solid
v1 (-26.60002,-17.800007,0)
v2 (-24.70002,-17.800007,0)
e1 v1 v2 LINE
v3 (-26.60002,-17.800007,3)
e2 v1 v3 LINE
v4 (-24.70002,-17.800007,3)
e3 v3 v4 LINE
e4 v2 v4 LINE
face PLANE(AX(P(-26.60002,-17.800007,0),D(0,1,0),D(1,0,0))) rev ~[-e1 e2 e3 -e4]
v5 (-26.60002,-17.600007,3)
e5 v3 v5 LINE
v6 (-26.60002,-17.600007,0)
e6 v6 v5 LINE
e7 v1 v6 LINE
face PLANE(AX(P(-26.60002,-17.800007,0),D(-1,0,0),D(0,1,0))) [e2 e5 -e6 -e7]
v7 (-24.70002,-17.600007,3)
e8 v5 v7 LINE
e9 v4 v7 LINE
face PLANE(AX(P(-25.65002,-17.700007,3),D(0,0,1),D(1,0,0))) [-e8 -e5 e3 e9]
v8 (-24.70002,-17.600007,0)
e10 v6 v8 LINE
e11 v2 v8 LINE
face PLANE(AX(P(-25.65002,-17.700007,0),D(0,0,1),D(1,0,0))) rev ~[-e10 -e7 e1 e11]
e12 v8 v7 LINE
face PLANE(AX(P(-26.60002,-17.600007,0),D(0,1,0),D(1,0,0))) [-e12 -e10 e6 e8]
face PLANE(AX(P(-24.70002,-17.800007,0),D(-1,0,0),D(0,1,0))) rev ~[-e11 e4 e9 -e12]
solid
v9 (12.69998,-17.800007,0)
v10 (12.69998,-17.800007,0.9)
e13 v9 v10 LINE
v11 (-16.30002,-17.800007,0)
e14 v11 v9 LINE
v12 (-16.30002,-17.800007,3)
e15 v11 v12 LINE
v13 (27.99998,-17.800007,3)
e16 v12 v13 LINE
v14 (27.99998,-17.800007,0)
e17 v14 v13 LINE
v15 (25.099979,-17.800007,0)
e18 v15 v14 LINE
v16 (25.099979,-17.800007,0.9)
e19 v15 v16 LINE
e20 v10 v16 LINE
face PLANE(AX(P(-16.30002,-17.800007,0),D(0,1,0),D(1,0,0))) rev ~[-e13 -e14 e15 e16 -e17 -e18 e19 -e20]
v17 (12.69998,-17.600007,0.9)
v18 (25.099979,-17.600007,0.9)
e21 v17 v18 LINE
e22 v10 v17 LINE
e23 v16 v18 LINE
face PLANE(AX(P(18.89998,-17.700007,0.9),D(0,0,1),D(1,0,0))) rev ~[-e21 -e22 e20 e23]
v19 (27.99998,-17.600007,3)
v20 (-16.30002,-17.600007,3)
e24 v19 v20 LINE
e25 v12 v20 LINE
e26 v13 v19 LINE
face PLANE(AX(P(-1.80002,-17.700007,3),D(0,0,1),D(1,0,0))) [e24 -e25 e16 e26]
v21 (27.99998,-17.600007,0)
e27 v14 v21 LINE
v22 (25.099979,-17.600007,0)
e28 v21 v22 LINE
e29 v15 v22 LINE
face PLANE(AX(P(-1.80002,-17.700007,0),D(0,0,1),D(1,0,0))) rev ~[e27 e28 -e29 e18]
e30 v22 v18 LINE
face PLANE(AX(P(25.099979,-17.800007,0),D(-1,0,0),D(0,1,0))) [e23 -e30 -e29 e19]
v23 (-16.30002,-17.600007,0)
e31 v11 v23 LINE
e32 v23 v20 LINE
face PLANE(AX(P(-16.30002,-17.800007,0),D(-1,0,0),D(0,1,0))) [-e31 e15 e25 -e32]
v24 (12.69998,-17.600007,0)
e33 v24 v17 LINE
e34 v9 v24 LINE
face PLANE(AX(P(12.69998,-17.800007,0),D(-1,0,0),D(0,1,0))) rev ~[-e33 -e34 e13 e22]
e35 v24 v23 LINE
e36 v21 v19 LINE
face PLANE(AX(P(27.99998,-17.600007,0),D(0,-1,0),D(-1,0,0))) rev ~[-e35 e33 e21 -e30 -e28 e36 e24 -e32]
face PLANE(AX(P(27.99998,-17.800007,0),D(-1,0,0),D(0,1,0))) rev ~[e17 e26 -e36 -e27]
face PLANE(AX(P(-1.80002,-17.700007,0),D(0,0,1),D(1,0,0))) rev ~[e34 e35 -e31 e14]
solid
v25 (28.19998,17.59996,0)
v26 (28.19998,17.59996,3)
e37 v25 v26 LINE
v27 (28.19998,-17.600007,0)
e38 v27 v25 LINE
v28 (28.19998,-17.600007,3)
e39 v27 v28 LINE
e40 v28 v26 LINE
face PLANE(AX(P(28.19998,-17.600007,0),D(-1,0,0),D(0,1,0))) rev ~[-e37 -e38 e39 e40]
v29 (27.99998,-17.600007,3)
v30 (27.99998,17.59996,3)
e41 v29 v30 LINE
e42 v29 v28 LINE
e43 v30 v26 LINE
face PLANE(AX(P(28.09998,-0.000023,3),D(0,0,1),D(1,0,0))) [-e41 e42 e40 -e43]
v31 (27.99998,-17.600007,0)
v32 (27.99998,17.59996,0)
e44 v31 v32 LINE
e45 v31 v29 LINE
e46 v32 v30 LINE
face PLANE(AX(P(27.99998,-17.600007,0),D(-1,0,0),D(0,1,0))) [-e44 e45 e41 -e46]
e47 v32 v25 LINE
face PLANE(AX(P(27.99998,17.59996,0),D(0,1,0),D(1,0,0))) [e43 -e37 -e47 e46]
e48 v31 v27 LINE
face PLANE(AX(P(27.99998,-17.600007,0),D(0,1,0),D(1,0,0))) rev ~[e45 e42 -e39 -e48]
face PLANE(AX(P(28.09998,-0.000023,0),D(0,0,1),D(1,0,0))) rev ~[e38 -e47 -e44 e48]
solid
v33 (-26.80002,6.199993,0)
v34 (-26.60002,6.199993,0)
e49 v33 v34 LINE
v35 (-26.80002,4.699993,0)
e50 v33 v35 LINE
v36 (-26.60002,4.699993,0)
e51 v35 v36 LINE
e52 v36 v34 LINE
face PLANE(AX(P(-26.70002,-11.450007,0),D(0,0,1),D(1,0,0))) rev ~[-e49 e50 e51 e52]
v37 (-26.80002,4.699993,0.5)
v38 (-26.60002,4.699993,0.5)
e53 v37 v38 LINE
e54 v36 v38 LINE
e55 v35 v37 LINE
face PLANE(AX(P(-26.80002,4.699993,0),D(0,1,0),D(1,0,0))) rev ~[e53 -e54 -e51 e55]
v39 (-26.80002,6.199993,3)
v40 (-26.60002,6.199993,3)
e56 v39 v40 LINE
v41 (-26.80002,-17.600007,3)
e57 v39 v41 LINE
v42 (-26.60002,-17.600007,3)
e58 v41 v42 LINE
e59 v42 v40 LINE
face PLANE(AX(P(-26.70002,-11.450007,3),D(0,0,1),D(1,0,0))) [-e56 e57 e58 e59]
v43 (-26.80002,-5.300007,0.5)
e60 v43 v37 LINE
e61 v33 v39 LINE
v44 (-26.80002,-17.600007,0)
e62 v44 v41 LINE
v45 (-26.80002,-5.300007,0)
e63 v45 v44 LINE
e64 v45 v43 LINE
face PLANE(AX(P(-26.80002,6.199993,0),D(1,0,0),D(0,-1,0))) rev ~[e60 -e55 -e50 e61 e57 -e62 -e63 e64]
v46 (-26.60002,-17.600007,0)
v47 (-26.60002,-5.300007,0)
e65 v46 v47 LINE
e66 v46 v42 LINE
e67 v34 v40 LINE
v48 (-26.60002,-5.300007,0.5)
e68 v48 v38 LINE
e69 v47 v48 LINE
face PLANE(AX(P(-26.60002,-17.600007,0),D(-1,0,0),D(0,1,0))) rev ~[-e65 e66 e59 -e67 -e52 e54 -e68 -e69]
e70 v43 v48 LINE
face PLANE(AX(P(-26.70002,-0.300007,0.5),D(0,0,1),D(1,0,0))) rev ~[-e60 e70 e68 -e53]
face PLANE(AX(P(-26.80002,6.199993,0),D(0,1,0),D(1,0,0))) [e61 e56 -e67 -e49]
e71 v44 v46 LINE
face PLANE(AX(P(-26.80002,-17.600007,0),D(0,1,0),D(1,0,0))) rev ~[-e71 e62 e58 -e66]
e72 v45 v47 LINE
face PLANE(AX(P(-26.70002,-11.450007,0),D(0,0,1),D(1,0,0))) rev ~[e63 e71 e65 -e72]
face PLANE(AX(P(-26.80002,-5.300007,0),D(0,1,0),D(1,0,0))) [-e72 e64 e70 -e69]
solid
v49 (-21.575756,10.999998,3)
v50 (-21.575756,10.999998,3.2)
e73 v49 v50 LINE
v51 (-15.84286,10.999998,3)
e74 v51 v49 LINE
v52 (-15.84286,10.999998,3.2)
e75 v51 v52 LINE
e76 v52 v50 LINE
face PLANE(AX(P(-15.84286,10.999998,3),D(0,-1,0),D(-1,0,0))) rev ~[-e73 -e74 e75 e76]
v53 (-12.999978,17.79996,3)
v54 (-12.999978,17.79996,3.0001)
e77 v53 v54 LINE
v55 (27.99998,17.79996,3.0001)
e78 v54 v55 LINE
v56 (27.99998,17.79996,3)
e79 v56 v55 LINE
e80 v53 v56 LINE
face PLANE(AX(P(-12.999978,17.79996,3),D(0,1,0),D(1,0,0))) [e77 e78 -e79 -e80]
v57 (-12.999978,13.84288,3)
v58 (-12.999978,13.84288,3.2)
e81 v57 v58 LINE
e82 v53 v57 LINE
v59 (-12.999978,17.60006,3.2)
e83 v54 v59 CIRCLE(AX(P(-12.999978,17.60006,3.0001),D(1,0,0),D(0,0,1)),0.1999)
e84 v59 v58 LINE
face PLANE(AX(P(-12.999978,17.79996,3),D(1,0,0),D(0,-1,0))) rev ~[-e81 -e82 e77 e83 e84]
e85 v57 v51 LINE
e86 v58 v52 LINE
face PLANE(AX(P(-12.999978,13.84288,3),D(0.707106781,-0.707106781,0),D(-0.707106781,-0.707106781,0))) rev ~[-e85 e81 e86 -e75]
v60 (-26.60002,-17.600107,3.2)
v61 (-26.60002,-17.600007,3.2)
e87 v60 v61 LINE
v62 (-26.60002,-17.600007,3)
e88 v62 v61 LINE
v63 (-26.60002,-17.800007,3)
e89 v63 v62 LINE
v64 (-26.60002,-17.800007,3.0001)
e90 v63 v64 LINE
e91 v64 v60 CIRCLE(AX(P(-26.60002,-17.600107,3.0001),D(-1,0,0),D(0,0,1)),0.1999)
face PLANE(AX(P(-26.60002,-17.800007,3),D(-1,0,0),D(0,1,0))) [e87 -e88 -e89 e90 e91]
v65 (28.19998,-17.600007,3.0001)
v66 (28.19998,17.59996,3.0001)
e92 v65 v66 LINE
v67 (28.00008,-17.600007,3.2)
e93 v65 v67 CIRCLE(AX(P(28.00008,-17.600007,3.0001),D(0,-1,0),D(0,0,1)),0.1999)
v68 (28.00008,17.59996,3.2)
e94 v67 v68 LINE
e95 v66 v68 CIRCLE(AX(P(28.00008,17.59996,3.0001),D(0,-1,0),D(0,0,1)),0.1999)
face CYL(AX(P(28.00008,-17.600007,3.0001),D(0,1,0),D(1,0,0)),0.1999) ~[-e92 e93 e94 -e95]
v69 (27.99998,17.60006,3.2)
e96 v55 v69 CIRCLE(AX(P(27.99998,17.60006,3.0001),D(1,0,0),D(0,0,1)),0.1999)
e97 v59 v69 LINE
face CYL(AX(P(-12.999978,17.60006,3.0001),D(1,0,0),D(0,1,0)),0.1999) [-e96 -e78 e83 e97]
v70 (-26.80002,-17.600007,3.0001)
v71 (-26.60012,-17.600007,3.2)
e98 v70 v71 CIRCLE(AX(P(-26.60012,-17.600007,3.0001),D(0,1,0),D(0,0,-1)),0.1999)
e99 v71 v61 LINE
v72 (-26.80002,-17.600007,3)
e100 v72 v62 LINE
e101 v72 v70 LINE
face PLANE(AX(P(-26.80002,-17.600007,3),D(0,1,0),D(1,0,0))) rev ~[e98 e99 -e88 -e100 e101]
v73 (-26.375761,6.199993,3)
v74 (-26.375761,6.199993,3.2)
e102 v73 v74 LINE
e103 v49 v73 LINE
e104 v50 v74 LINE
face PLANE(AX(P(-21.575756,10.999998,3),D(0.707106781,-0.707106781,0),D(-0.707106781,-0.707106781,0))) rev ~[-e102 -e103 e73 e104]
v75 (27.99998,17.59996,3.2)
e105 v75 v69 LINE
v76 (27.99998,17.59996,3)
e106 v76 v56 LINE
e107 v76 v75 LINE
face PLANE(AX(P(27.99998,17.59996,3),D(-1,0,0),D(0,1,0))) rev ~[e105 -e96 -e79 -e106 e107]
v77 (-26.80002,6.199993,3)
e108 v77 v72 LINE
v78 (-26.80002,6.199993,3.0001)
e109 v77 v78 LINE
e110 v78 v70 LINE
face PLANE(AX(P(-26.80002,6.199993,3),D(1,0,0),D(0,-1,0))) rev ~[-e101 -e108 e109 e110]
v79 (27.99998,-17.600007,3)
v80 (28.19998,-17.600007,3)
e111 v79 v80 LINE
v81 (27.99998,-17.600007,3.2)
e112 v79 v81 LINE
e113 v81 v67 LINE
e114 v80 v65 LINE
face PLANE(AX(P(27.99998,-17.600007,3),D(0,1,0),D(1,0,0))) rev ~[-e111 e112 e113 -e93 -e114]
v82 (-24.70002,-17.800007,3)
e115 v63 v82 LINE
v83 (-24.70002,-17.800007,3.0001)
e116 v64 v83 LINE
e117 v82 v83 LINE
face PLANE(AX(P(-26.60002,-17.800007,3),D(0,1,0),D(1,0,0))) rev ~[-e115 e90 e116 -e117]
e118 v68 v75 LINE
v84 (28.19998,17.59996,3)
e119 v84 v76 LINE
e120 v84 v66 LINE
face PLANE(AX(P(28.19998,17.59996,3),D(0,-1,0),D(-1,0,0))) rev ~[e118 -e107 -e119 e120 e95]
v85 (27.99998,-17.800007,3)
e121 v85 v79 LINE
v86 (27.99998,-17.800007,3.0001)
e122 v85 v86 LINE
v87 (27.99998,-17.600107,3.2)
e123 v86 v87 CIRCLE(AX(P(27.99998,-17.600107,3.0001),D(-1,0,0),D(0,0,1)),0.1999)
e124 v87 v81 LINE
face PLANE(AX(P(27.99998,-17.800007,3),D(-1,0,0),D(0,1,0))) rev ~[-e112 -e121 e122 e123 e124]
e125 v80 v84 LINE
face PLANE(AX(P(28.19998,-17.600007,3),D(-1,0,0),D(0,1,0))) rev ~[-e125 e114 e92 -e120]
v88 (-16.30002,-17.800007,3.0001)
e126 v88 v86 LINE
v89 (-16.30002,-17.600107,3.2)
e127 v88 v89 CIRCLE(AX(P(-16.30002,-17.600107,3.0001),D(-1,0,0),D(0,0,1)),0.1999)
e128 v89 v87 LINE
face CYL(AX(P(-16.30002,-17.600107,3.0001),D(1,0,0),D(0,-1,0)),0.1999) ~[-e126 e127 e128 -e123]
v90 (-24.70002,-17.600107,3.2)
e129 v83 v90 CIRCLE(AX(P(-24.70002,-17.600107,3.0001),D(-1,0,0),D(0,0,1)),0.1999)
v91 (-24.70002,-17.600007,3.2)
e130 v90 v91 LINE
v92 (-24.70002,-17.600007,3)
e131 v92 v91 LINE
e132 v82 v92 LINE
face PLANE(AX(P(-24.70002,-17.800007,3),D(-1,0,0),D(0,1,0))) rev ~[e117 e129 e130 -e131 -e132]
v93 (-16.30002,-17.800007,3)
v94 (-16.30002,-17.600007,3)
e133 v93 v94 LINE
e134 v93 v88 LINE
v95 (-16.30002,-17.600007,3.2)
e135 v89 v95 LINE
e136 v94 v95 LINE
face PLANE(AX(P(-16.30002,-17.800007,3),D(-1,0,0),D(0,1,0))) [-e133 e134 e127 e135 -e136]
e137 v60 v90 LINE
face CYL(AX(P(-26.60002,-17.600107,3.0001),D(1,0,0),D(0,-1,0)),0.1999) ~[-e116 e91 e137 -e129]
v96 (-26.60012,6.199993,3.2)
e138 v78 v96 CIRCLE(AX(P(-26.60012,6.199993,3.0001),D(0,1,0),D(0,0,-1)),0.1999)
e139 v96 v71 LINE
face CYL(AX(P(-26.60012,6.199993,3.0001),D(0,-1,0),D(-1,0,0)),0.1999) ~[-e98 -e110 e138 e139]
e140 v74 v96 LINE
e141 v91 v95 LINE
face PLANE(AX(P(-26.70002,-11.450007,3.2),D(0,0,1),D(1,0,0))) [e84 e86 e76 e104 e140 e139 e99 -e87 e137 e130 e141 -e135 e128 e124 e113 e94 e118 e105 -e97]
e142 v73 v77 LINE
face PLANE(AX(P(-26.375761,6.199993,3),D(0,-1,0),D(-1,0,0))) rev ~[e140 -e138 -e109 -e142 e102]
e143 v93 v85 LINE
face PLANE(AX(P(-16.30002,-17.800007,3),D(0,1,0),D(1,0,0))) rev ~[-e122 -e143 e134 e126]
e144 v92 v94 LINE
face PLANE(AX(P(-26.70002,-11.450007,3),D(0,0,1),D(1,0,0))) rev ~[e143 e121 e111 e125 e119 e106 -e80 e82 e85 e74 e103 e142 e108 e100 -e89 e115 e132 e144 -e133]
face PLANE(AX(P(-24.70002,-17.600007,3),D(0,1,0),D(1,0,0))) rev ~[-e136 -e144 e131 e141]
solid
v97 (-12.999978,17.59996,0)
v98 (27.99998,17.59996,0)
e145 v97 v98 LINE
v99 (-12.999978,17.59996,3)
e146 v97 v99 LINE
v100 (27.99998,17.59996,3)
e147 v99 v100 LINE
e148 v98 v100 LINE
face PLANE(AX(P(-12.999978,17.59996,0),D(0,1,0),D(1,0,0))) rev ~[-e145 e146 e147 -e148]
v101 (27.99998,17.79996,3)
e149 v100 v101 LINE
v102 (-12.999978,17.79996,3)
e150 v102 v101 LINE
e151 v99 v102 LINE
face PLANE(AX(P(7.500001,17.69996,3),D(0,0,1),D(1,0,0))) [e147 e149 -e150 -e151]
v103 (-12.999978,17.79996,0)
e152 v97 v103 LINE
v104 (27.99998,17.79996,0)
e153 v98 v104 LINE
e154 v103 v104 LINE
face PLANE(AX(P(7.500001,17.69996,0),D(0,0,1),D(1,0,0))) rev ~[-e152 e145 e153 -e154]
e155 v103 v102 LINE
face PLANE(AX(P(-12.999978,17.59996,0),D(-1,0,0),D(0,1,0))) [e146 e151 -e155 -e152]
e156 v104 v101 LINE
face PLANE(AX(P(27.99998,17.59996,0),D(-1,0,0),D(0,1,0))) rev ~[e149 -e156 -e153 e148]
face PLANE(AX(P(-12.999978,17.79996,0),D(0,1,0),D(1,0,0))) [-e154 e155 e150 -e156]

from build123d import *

# Parameters (mm, degrees)
F0_W     = 0.2
F0_H     = 12.3
F0_H_2   = 10
F0_H_3   = 1.5
F1_DEPTH = 3
F0_W_2   = 1.9
F0_H_4   = 0.2
F0_W_3   = 29
F0_W_4   = 2.900001
F0_W_5   = 12.399999
F0_W_6   = 40.999958
F0_H_5   = 35.199967
F2_START = 3
F2_DEPTH = 0.2
F3_DEPTH = 0.9
F4_DEPTH = 0.5
F5_R     = 0.1999


# Not quite as in the source:
# - a fillet or chamfer is up to 0.001 mm smaller than in the source, because OpenCascade refuses the exact size


with BuildPart() as f1:
    # F0 (on Top) → F1 (new body)
    with BuildSketch(Plane.XY):
        with Locations((-26.70002, -11.450007)):
            Rectangle(F0_W, F0_H)
        with Locations((-26.70002, -0.300007)):
            Rectangle(F0_W, F0_H_2)
        with Locations((-26.70002, 5.449993)):
            Rectangle(F0_W, F0_H_3)
    extrude(amount=F1_DEPTH)

    # F0 (on Top) → F4 (cut)
    with BuildSketch(Plane.XY):
        with Locations((-26.70002, -0.300007)):
            Rectangle(F0_W, F0_H_2)
    extrude(amount=F4_DEPTH, mode=Mode.SUBTRACT)


with BuildPart() as f1b:
    # F0 (on Top) → F1, piece 2 (new body)
    with BuildSketch(Plane.XY):
        with Locations((-25.65002, -17.700007)):
            Rectangle(F0_W_2, F0_H_4)
    extrude(amount=F1_DEPTH)


with BuildPart() as f1c:
    # F0 (on Top) → F1, piece 3 (new body)
    with BuildSketch(Plane.XY):
        with Locations((-1.80002, -17.700007)):
            Rectangle(F0_W_3, F0_H_4)
        with Locations((26.5499795, -17.700007)):
            Rectangle(F0_W_4, F0_H_4)
        with Locations((18.8999795, -17.700007)):
            Rectangle(F0_W_5, F0_H_4)
    extrude(amount=F1_DEPTH)

    # F0 (on Top) → F3 (cut)
    with BuildSketch(Plane.XY):
        with Locations((18.8999795, -17.700007)):
            Rectangle(F0_W_5, F0_H_4)
    extrude(amount=F3_DEPTH, mode=Mode.SUBTRACT)


with BuildPart() as f1d:
    # F0 (on Top) → F1, piece 4 (new body)
    with BuildSketch(Plane.XY):
        with Locations((7.500001, 17.69996)):
            Rectangle(F0_W_6, F0_H_4)
    extrude(amount=F1_DEPTH)


with BuildPart() as f1e:
    # F0 (on Top) → F1, piece 5 (new body)
    with BuildSketch(Plane.XY):
        with Locations((28.09998, -2.35e-05)):
            Rectangle(F0_W, F0_H_5)
    extrude(amount=F1_DEPTH)


with BuildPart() as f2:
    # F0 (on Top) → F2 (new body)
    with BuildSketch(Plane.XY.offset(F2_START)):
        with Locations((-26.70002, -11.450007)):
            Rectangle(F0_W, F0_H)
        Polygon((-26.60002, -5.300007), (-26.60002, -17.600007), (-24.70002, -17.600007), (-16.30002, -17.600007), (12.69998, -17.600007), (25.099979, -17.600007), (27.99998, -17.600007), (27.99998, 17.59996), (-12.999978, 17.59996), (-12.999978, 13.84288), (-15.84286, 10.999998), (-21.575756, 10.999998), (-26.375761, 6.199993), (-26.60002, 6.199993), (-26.60002, 4.699993), align=None)
        with Locations((-25.65002, -17.700007)):
            Rectangle(F0_W_2, F0_H_4)
        with Locations((-1.80002, -17.700007)):
            Rectangle(F0_W_3, F0_H_4)
        with Locations((18.8999795, -17.700007)):
            Rectangle(F0_W_5, F0_H_4)
        with Locations((26.5499795, -17.700007)):
            Rectangle(F0_W_4, F0_H_4)
        with Locations((28.09998, -2.35e-05)):
            Rectangle(F0_W, F0_H_5)
        with Locations((7.500001, 17.69996)):
            Rectangle(F0_W_6, F0_H_4)
        with Locations((-26.70002, 5.449993)):
            Rectangle(F0_W, F0_H_3)
        with Locations((-26.70002, -0.300007)):
            Rectangle(F0_W, F0_H_2)
    extrude(amount=F2_DEPTH)

    # F5 (radius 0.2 in the source; OpenCascade refuses exactly that, so slightly less here)
    f5_edges = [f2.edges().sort_by_distance(p)[0] for p in [
        (5.84998, -17.800007, 3.2),
        (-26.80002, -5.700007, 3.2),
        (7.500001, 17.79996, 3.2),
        (28.19998, -2.4e-05, 3.2),
        (-25.65002, -17.800007, 3.2),
    ]]
    fillet(f5_edges, radius=F5_R)


solid = Compound([f1.part, f1b.part, f1c.part, f1d.part, f1e.part, f2.part])
